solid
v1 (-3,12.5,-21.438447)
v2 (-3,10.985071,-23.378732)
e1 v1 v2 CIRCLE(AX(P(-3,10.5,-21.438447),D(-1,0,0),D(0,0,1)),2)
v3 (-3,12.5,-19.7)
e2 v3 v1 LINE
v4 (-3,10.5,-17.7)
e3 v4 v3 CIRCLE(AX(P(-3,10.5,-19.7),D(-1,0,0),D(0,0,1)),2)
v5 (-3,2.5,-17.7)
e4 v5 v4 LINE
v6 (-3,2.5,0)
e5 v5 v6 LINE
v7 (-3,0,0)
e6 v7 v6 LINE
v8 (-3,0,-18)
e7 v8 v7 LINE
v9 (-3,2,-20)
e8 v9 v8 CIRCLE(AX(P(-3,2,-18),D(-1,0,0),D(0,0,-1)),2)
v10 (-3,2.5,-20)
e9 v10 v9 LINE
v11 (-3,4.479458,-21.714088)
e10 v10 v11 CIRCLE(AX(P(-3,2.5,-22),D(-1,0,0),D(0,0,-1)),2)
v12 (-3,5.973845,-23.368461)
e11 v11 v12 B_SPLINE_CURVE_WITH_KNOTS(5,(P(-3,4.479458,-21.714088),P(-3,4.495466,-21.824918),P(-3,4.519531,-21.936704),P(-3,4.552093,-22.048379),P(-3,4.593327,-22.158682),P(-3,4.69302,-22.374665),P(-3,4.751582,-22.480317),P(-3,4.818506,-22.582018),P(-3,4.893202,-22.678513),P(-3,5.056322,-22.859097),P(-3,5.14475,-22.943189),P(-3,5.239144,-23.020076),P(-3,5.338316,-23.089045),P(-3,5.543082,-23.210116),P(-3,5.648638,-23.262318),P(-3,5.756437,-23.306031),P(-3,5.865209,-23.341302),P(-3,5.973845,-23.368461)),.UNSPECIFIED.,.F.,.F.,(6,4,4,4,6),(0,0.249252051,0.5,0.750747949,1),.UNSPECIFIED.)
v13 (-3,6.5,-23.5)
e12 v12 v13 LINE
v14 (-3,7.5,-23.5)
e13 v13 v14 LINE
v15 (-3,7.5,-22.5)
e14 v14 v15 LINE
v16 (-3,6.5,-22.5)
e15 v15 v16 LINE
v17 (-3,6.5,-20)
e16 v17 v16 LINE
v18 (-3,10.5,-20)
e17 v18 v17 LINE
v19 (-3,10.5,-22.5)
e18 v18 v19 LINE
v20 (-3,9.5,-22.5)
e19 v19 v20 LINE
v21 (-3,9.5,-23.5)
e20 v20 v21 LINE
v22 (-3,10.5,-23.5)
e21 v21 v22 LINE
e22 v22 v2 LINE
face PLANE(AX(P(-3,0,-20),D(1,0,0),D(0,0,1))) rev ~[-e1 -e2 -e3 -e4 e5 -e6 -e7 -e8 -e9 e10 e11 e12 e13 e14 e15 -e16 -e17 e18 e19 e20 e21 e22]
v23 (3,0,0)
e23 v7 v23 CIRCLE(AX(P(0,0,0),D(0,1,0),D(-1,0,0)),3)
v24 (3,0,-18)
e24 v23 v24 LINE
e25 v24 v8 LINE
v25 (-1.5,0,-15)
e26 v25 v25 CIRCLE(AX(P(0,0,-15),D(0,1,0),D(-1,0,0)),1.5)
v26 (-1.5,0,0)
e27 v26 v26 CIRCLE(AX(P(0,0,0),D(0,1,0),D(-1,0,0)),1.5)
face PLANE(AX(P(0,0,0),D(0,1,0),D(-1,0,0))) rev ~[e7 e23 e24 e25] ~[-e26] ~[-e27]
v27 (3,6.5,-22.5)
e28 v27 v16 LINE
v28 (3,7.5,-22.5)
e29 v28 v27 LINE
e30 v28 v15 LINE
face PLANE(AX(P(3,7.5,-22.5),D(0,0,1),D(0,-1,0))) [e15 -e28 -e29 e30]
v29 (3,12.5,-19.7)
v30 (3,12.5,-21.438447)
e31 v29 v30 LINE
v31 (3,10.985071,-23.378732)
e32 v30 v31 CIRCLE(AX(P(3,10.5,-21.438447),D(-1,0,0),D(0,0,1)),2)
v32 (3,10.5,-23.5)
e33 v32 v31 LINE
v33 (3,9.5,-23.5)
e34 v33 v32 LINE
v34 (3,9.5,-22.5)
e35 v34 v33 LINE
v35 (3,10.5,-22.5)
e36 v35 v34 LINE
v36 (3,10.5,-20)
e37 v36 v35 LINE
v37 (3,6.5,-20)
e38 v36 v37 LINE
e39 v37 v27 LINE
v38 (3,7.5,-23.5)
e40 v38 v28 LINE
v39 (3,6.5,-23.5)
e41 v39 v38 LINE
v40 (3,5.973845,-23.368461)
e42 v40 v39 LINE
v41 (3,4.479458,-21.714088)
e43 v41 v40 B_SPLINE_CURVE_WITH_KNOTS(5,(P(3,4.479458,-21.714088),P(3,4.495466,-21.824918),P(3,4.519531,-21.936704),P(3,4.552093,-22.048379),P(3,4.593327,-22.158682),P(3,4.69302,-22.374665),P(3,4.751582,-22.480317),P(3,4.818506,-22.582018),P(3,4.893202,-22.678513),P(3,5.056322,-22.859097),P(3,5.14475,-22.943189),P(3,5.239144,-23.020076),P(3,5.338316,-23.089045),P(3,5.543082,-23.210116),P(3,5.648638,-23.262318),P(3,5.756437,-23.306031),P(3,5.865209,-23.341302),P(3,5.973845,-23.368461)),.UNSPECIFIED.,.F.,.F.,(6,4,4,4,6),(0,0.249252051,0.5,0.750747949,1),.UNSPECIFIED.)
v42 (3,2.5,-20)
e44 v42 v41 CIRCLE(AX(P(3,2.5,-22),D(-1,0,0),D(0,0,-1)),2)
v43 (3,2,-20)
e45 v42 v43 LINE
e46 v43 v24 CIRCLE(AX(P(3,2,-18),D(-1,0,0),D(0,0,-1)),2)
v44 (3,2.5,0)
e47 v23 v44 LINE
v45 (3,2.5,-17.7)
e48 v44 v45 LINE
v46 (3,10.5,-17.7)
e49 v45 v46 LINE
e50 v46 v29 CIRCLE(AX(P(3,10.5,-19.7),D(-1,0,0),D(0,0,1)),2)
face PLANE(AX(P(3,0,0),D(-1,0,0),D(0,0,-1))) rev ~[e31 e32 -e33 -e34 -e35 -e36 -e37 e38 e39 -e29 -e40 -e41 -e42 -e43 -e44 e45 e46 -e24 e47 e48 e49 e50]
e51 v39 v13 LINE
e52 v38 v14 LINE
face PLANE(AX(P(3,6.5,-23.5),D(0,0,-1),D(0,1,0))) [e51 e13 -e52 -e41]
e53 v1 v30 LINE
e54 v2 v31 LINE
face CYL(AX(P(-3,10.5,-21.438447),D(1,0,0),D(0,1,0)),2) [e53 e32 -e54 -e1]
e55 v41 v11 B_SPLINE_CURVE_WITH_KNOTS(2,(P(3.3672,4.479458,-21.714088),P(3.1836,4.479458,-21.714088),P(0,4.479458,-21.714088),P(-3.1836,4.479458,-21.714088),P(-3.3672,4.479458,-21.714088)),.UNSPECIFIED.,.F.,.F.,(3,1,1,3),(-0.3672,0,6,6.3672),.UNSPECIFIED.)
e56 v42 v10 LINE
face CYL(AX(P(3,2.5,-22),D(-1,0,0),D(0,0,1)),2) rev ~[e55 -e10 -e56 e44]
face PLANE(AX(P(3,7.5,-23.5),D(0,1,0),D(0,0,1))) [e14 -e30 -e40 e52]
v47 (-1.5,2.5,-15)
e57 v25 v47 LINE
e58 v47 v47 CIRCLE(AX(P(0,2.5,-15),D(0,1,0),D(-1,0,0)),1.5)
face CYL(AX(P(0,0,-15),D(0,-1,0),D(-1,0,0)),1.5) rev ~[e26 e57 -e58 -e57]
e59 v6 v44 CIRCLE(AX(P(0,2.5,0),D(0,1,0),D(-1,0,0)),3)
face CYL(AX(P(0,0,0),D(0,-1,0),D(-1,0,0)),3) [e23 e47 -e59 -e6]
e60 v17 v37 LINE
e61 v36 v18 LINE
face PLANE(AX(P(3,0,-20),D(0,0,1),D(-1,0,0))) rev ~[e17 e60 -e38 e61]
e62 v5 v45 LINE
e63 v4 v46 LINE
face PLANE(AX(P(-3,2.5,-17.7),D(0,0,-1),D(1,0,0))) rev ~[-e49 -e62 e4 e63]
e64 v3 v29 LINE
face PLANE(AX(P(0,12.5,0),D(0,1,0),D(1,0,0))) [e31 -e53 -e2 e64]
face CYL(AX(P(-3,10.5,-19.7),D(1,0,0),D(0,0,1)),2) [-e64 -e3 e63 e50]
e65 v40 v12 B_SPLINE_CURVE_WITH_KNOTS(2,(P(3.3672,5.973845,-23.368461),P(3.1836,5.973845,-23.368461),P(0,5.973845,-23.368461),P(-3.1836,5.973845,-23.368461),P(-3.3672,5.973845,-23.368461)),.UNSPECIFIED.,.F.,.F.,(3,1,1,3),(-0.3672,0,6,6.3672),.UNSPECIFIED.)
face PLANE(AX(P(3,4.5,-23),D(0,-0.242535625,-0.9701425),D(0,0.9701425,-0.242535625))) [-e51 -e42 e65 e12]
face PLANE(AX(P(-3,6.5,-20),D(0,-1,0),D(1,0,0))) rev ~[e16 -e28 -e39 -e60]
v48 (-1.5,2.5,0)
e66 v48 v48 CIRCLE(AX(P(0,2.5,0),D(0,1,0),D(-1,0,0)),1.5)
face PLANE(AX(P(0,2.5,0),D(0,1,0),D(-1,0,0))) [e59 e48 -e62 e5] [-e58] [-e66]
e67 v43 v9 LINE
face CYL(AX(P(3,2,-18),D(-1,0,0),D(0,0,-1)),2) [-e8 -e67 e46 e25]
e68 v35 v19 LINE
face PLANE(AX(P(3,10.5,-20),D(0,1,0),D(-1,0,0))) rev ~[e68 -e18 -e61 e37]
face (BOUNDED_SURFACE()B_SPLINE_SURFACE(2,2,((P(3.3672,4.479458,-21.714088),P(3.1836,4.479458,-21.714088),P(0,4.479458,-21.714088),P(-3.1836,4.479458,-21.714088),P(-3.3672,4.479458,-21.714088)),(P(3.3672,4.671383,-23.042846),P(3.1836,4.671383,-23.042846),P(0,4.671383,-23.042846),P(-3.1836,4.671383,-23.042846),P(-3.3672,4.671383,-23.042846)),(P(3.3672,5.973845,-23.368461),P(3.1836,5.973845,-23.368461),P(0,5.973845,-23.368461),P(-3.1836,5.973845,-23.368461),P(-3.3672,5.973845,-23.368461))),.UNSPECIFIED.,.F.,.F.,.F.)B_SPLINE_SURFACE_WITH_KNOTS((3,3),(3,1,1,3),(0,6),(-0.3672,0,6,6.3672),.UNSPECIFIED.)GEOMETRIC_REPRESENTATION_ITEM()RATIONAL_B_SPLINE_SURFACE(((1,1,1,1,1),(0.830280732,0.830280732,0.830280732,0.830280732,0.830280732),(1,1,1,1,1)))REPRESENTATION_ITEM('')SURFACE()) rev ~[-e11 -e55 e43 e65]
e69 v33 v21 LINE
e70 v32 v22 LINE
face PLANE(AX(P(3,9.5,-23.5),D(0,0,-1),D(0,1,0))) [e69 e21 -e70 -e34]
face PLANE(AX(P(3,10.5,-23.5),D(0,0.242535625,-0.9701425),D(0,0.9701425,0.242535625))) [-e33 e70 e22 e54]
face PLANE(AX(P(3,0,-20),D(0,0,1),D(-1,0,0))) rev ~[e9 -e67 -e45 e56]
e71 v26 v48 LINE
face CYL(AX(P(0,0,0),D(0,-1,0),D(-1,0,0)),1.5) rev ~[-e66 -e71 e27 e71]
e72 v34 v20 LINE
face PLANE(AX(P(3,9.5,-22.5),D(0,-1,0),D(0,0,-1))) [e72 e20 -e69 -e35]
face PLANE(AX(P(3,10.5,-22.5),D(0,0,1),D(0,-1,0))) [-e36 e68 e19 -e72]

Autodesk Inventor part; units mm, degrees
ref_plane "YZ Plane" through (0, 0, 0) normal (1, 0, 0) x (0, 1, 0)
ref_plane "XZ Plane" through (0, 0, 0) normal (0, 1, 0) x (-1, 0, 0)
ref_plane "XY Plane" through (0, 0, 0) normal (0, 0, 1) x (1, 0, 0)
sketch "Sketch1" plane through (0, 0, 0) normal (0, 1, 0) x (-1, 0, 0)
  circle A0 centre (0, 0) radius 1.5
  line L0 (0, 0) -> (0, -15)
  line L1 (0, 0) -> (15, 0) construction
  circle A1 centre (0, -15) radius 1.5
  line L2 (0, -15) -> (0, -17.5)
  line L3 (0, -17.5) -> (0, -20)
  circle A2 centre (0, 0) radius 3
  line L4 (3, 0) -> (-3, 0)
  line L5 (-3, 0) -> (-3, -20)
  line L6 (-3, -20) -> (3, -20)
  line L7 (3, -20) -> (3, 0)
  dimension "d6" = 6
  dimension "d0" = 3
  dimension "d1" = 15
  dimension "d2" = 90
  dimension "d3" = 3
  dimension "d4" = 2.5
  dimension "d5" = 2.5
sketch "Sketch1 outline for Extrusion1" plane through (0, 0, 0) normal (0, 1, 0) x (-1, 0, 0)
  arc A0 (3, 0) -> (-3, 0) centre (0, 0) ccw
  line L0 (3, -20) -> (3, 0)
  line L1 (-3, 0) -> (-3, -20)
  line L2 (-3, -20) -> (3, -20)
  circle A1 centre (0, -15) radius 1.5
  circle A2 centre (0, 0) radius 1.5
extrude "Extrusion1" add sketch "Sketch1 outline for Extrusion1" along normal blind 2.5
sketch "Sketch2" plane through (0, 2.5, 0) normal (0, 1, 0) x (1, 0, 0)
  line L0 (3, 20) -> (-3, 20) projected
  line L1 (-3, 20) -> (3, 20)
  line L2 (3, 20) -> (3, 17.7)
  line L3 (3, 17.7) -> (-3, 17.7)
  line L4 (-3, 17.7) -> (-3, 20)
  point P0 (0, 0)
  dimension "d9" = 2.3
sketch "Sketch2 outline for Extrusion2" plane through (0, 2.5, 0) normal (0, 1, 0) x (1, 0, 0)
  line L0 (-3, 20) -> (-3, 17.7)
  line L1 (3, 20) -> (-3, 20)
  line L2 (3, 17.7) -> (3, 20)
  line L3 (-3, 17.7) -> (3, 17.7)
extrude "Extrusion2" add sketch "Sketch2 outline for Extrusion2" along normal blind 10
sketch "Sketch3" plane through (3, 0, -20) normal (0, 0, -1) x (-1, 0, 0)
  line L0 (0, 0) -> (0, 12.5) projected
  line L1 (6, 0) -> (6, 12.5) projected
  line L2 (0, 12.5) -> (6, 12.5)
  line L3 (6, 12.5) -> (6, 10.5)
  line L4 (6, 10.5) -> (0, 10.5)
  line L5 (0, 10.5) -> (0, 12.5)
  line L6 (0, 10.5) -> (6, 10.5)
  line L7 (6, 10.5) -> (6, 6.5)
  line L8 (6, 6.5) -> (0, 6.5)
  line L9 (0, 6.5) -> (0, 10.5)
  line L10 (0, 6.5) -> (6, 6.5)
  line L11 (6, 6.5) -> (6, 4.5)
  line L12 (6, 4.5) -> (0, 4.5)
  line L13 (0, 4.5) -> (0, 6.5)
  point P0 (3, 0)
  point P1 (0, 4.5)
  point P2 (0, 6.5)
  point P3 (0, 10.5)
  dimension "d12" = 2
  dimension "d13" = 6
  dimension "d14" = 4
  dimension "d15" = 2
sketch "Sketch3 outline for Extrusion3" plane through (3, 0, -20) normal (0, 0, -1) x (-1, 0, 0)
  line L0 (0, 4.5) -> (6, 4.5)
  line L1 (0, 6.5) -> (0, 4.5)
  line L2 (6, 6.5) -> (0, 6.5)
  line L3 (6, 4.5) -> (6, 6.5)
  line L4 (6, 12.5) -> (0, 12.5)
  line L5 (6, 10.5) -> (6, 12.5)
  line L6 (0, 10.5) -> (6, 10.5)
  line L7 (0, 12.5) -> (0, 10.5)
extrude "Extrusion3" add sketch "Sketch3 outline for Extrusion3" along normal blind 3
sketch "Sketch4" plane through (3, 0, 0) normal (1, 0, 0) x (0, 0, -1)
  line L0 (20, 10.5) -> (23, 10.5)
  line L1 (20, 6.5) -> (23, 6.5)
  line L2 (23, 10.5) -> (22.5, 10.5)
  line L3 (22.5, 10.5) -> (22.5, 6.5)
  line L4 (22.5, 6.5) -> (23, 6.5)
  line L5 (23, 6.5) -> (23, 10.5)
  line L6 (22.5, 10.5) -> (23.5, 10.5)
  line L7 (23.5, 10.5) -> (23.5, 9.5)
  line L8 (23.5, 9.5) -> (22.5, 9.5)
  line L9 (22.5, 9.5) -> (22.5, 10.5)
  line L10 (22.5, 6.5) -> (23.5, 6.5)
  line L11 (23.5, 6.5) -> (23.5, 7.5)
  line L12 (23.5, 7.5) -> (22.5, 7.5)
  line L13 (22.5, 7.5) -> (22.5, 6.5)
  line L14 (23, 12.5) -> (23, 10.5)
  line L15 (23.5, 10.5) -> (23, 12.5)
  line L16 (23, 12.5) -> (23, 10.5)
  line L17 (23.5, 6.5) -> (23, 4.499196)
  line L18 (23, 4.5) -> (23, 6.5)
  line L19 (23, 4.499196) -> (23, 6.5)
  point P0 (0, 0)
  dimension "d18" = 0.5
  dimension "d19" = 1
  dimension "d20" = 1
  dimension "d21" = 1
  dimension "d22" = 1
sketch "Sketch4 outline for Extrusion4" plane through (3, 0, 0) normal (1, 0, 0) x (0, 0, -1)
  line L0 (23, 4.5) -> (23.5, 6.5)
  line L1 (23, 6.5) -> (23, 4.5)
  line L2 (22.5, 6.5) -> (23, 6.5)
  line L3 (22.5, 7.5) -> (22.5, 6.5)
  line L4 (23.5, 7.5) -> (22.5, 7.5)
  line L5 (23.5, 6.5) -> (23.5, 7.5)
  line L6 (22.5, 9.5) -> (23.5, 9.5)
  line L7 (22.5, 10.5) -> (22.5, 9.5)
  line L8 (23, 10.5) -> (22.5, 10.5)
  line L9 (23, 12.5) -> (23, 10.5)
  line L10 (23.5, 10.5) -> (23, 12.5)
  line L11 (23.5, 9.5) -> (23.5, 10.5)
extrude "Extrusion4" add sketch "Sketch4 outline for Extrusion4" against normal blind 6
fillet "Fillet1" radius 2 5 edges at (0, 12.5, -23) (0, 12.5, -17.7) (0, 4.5, -23) (0, 4.5, -20) (0, 0, -20)
properties part number "wire_holder_femur"
